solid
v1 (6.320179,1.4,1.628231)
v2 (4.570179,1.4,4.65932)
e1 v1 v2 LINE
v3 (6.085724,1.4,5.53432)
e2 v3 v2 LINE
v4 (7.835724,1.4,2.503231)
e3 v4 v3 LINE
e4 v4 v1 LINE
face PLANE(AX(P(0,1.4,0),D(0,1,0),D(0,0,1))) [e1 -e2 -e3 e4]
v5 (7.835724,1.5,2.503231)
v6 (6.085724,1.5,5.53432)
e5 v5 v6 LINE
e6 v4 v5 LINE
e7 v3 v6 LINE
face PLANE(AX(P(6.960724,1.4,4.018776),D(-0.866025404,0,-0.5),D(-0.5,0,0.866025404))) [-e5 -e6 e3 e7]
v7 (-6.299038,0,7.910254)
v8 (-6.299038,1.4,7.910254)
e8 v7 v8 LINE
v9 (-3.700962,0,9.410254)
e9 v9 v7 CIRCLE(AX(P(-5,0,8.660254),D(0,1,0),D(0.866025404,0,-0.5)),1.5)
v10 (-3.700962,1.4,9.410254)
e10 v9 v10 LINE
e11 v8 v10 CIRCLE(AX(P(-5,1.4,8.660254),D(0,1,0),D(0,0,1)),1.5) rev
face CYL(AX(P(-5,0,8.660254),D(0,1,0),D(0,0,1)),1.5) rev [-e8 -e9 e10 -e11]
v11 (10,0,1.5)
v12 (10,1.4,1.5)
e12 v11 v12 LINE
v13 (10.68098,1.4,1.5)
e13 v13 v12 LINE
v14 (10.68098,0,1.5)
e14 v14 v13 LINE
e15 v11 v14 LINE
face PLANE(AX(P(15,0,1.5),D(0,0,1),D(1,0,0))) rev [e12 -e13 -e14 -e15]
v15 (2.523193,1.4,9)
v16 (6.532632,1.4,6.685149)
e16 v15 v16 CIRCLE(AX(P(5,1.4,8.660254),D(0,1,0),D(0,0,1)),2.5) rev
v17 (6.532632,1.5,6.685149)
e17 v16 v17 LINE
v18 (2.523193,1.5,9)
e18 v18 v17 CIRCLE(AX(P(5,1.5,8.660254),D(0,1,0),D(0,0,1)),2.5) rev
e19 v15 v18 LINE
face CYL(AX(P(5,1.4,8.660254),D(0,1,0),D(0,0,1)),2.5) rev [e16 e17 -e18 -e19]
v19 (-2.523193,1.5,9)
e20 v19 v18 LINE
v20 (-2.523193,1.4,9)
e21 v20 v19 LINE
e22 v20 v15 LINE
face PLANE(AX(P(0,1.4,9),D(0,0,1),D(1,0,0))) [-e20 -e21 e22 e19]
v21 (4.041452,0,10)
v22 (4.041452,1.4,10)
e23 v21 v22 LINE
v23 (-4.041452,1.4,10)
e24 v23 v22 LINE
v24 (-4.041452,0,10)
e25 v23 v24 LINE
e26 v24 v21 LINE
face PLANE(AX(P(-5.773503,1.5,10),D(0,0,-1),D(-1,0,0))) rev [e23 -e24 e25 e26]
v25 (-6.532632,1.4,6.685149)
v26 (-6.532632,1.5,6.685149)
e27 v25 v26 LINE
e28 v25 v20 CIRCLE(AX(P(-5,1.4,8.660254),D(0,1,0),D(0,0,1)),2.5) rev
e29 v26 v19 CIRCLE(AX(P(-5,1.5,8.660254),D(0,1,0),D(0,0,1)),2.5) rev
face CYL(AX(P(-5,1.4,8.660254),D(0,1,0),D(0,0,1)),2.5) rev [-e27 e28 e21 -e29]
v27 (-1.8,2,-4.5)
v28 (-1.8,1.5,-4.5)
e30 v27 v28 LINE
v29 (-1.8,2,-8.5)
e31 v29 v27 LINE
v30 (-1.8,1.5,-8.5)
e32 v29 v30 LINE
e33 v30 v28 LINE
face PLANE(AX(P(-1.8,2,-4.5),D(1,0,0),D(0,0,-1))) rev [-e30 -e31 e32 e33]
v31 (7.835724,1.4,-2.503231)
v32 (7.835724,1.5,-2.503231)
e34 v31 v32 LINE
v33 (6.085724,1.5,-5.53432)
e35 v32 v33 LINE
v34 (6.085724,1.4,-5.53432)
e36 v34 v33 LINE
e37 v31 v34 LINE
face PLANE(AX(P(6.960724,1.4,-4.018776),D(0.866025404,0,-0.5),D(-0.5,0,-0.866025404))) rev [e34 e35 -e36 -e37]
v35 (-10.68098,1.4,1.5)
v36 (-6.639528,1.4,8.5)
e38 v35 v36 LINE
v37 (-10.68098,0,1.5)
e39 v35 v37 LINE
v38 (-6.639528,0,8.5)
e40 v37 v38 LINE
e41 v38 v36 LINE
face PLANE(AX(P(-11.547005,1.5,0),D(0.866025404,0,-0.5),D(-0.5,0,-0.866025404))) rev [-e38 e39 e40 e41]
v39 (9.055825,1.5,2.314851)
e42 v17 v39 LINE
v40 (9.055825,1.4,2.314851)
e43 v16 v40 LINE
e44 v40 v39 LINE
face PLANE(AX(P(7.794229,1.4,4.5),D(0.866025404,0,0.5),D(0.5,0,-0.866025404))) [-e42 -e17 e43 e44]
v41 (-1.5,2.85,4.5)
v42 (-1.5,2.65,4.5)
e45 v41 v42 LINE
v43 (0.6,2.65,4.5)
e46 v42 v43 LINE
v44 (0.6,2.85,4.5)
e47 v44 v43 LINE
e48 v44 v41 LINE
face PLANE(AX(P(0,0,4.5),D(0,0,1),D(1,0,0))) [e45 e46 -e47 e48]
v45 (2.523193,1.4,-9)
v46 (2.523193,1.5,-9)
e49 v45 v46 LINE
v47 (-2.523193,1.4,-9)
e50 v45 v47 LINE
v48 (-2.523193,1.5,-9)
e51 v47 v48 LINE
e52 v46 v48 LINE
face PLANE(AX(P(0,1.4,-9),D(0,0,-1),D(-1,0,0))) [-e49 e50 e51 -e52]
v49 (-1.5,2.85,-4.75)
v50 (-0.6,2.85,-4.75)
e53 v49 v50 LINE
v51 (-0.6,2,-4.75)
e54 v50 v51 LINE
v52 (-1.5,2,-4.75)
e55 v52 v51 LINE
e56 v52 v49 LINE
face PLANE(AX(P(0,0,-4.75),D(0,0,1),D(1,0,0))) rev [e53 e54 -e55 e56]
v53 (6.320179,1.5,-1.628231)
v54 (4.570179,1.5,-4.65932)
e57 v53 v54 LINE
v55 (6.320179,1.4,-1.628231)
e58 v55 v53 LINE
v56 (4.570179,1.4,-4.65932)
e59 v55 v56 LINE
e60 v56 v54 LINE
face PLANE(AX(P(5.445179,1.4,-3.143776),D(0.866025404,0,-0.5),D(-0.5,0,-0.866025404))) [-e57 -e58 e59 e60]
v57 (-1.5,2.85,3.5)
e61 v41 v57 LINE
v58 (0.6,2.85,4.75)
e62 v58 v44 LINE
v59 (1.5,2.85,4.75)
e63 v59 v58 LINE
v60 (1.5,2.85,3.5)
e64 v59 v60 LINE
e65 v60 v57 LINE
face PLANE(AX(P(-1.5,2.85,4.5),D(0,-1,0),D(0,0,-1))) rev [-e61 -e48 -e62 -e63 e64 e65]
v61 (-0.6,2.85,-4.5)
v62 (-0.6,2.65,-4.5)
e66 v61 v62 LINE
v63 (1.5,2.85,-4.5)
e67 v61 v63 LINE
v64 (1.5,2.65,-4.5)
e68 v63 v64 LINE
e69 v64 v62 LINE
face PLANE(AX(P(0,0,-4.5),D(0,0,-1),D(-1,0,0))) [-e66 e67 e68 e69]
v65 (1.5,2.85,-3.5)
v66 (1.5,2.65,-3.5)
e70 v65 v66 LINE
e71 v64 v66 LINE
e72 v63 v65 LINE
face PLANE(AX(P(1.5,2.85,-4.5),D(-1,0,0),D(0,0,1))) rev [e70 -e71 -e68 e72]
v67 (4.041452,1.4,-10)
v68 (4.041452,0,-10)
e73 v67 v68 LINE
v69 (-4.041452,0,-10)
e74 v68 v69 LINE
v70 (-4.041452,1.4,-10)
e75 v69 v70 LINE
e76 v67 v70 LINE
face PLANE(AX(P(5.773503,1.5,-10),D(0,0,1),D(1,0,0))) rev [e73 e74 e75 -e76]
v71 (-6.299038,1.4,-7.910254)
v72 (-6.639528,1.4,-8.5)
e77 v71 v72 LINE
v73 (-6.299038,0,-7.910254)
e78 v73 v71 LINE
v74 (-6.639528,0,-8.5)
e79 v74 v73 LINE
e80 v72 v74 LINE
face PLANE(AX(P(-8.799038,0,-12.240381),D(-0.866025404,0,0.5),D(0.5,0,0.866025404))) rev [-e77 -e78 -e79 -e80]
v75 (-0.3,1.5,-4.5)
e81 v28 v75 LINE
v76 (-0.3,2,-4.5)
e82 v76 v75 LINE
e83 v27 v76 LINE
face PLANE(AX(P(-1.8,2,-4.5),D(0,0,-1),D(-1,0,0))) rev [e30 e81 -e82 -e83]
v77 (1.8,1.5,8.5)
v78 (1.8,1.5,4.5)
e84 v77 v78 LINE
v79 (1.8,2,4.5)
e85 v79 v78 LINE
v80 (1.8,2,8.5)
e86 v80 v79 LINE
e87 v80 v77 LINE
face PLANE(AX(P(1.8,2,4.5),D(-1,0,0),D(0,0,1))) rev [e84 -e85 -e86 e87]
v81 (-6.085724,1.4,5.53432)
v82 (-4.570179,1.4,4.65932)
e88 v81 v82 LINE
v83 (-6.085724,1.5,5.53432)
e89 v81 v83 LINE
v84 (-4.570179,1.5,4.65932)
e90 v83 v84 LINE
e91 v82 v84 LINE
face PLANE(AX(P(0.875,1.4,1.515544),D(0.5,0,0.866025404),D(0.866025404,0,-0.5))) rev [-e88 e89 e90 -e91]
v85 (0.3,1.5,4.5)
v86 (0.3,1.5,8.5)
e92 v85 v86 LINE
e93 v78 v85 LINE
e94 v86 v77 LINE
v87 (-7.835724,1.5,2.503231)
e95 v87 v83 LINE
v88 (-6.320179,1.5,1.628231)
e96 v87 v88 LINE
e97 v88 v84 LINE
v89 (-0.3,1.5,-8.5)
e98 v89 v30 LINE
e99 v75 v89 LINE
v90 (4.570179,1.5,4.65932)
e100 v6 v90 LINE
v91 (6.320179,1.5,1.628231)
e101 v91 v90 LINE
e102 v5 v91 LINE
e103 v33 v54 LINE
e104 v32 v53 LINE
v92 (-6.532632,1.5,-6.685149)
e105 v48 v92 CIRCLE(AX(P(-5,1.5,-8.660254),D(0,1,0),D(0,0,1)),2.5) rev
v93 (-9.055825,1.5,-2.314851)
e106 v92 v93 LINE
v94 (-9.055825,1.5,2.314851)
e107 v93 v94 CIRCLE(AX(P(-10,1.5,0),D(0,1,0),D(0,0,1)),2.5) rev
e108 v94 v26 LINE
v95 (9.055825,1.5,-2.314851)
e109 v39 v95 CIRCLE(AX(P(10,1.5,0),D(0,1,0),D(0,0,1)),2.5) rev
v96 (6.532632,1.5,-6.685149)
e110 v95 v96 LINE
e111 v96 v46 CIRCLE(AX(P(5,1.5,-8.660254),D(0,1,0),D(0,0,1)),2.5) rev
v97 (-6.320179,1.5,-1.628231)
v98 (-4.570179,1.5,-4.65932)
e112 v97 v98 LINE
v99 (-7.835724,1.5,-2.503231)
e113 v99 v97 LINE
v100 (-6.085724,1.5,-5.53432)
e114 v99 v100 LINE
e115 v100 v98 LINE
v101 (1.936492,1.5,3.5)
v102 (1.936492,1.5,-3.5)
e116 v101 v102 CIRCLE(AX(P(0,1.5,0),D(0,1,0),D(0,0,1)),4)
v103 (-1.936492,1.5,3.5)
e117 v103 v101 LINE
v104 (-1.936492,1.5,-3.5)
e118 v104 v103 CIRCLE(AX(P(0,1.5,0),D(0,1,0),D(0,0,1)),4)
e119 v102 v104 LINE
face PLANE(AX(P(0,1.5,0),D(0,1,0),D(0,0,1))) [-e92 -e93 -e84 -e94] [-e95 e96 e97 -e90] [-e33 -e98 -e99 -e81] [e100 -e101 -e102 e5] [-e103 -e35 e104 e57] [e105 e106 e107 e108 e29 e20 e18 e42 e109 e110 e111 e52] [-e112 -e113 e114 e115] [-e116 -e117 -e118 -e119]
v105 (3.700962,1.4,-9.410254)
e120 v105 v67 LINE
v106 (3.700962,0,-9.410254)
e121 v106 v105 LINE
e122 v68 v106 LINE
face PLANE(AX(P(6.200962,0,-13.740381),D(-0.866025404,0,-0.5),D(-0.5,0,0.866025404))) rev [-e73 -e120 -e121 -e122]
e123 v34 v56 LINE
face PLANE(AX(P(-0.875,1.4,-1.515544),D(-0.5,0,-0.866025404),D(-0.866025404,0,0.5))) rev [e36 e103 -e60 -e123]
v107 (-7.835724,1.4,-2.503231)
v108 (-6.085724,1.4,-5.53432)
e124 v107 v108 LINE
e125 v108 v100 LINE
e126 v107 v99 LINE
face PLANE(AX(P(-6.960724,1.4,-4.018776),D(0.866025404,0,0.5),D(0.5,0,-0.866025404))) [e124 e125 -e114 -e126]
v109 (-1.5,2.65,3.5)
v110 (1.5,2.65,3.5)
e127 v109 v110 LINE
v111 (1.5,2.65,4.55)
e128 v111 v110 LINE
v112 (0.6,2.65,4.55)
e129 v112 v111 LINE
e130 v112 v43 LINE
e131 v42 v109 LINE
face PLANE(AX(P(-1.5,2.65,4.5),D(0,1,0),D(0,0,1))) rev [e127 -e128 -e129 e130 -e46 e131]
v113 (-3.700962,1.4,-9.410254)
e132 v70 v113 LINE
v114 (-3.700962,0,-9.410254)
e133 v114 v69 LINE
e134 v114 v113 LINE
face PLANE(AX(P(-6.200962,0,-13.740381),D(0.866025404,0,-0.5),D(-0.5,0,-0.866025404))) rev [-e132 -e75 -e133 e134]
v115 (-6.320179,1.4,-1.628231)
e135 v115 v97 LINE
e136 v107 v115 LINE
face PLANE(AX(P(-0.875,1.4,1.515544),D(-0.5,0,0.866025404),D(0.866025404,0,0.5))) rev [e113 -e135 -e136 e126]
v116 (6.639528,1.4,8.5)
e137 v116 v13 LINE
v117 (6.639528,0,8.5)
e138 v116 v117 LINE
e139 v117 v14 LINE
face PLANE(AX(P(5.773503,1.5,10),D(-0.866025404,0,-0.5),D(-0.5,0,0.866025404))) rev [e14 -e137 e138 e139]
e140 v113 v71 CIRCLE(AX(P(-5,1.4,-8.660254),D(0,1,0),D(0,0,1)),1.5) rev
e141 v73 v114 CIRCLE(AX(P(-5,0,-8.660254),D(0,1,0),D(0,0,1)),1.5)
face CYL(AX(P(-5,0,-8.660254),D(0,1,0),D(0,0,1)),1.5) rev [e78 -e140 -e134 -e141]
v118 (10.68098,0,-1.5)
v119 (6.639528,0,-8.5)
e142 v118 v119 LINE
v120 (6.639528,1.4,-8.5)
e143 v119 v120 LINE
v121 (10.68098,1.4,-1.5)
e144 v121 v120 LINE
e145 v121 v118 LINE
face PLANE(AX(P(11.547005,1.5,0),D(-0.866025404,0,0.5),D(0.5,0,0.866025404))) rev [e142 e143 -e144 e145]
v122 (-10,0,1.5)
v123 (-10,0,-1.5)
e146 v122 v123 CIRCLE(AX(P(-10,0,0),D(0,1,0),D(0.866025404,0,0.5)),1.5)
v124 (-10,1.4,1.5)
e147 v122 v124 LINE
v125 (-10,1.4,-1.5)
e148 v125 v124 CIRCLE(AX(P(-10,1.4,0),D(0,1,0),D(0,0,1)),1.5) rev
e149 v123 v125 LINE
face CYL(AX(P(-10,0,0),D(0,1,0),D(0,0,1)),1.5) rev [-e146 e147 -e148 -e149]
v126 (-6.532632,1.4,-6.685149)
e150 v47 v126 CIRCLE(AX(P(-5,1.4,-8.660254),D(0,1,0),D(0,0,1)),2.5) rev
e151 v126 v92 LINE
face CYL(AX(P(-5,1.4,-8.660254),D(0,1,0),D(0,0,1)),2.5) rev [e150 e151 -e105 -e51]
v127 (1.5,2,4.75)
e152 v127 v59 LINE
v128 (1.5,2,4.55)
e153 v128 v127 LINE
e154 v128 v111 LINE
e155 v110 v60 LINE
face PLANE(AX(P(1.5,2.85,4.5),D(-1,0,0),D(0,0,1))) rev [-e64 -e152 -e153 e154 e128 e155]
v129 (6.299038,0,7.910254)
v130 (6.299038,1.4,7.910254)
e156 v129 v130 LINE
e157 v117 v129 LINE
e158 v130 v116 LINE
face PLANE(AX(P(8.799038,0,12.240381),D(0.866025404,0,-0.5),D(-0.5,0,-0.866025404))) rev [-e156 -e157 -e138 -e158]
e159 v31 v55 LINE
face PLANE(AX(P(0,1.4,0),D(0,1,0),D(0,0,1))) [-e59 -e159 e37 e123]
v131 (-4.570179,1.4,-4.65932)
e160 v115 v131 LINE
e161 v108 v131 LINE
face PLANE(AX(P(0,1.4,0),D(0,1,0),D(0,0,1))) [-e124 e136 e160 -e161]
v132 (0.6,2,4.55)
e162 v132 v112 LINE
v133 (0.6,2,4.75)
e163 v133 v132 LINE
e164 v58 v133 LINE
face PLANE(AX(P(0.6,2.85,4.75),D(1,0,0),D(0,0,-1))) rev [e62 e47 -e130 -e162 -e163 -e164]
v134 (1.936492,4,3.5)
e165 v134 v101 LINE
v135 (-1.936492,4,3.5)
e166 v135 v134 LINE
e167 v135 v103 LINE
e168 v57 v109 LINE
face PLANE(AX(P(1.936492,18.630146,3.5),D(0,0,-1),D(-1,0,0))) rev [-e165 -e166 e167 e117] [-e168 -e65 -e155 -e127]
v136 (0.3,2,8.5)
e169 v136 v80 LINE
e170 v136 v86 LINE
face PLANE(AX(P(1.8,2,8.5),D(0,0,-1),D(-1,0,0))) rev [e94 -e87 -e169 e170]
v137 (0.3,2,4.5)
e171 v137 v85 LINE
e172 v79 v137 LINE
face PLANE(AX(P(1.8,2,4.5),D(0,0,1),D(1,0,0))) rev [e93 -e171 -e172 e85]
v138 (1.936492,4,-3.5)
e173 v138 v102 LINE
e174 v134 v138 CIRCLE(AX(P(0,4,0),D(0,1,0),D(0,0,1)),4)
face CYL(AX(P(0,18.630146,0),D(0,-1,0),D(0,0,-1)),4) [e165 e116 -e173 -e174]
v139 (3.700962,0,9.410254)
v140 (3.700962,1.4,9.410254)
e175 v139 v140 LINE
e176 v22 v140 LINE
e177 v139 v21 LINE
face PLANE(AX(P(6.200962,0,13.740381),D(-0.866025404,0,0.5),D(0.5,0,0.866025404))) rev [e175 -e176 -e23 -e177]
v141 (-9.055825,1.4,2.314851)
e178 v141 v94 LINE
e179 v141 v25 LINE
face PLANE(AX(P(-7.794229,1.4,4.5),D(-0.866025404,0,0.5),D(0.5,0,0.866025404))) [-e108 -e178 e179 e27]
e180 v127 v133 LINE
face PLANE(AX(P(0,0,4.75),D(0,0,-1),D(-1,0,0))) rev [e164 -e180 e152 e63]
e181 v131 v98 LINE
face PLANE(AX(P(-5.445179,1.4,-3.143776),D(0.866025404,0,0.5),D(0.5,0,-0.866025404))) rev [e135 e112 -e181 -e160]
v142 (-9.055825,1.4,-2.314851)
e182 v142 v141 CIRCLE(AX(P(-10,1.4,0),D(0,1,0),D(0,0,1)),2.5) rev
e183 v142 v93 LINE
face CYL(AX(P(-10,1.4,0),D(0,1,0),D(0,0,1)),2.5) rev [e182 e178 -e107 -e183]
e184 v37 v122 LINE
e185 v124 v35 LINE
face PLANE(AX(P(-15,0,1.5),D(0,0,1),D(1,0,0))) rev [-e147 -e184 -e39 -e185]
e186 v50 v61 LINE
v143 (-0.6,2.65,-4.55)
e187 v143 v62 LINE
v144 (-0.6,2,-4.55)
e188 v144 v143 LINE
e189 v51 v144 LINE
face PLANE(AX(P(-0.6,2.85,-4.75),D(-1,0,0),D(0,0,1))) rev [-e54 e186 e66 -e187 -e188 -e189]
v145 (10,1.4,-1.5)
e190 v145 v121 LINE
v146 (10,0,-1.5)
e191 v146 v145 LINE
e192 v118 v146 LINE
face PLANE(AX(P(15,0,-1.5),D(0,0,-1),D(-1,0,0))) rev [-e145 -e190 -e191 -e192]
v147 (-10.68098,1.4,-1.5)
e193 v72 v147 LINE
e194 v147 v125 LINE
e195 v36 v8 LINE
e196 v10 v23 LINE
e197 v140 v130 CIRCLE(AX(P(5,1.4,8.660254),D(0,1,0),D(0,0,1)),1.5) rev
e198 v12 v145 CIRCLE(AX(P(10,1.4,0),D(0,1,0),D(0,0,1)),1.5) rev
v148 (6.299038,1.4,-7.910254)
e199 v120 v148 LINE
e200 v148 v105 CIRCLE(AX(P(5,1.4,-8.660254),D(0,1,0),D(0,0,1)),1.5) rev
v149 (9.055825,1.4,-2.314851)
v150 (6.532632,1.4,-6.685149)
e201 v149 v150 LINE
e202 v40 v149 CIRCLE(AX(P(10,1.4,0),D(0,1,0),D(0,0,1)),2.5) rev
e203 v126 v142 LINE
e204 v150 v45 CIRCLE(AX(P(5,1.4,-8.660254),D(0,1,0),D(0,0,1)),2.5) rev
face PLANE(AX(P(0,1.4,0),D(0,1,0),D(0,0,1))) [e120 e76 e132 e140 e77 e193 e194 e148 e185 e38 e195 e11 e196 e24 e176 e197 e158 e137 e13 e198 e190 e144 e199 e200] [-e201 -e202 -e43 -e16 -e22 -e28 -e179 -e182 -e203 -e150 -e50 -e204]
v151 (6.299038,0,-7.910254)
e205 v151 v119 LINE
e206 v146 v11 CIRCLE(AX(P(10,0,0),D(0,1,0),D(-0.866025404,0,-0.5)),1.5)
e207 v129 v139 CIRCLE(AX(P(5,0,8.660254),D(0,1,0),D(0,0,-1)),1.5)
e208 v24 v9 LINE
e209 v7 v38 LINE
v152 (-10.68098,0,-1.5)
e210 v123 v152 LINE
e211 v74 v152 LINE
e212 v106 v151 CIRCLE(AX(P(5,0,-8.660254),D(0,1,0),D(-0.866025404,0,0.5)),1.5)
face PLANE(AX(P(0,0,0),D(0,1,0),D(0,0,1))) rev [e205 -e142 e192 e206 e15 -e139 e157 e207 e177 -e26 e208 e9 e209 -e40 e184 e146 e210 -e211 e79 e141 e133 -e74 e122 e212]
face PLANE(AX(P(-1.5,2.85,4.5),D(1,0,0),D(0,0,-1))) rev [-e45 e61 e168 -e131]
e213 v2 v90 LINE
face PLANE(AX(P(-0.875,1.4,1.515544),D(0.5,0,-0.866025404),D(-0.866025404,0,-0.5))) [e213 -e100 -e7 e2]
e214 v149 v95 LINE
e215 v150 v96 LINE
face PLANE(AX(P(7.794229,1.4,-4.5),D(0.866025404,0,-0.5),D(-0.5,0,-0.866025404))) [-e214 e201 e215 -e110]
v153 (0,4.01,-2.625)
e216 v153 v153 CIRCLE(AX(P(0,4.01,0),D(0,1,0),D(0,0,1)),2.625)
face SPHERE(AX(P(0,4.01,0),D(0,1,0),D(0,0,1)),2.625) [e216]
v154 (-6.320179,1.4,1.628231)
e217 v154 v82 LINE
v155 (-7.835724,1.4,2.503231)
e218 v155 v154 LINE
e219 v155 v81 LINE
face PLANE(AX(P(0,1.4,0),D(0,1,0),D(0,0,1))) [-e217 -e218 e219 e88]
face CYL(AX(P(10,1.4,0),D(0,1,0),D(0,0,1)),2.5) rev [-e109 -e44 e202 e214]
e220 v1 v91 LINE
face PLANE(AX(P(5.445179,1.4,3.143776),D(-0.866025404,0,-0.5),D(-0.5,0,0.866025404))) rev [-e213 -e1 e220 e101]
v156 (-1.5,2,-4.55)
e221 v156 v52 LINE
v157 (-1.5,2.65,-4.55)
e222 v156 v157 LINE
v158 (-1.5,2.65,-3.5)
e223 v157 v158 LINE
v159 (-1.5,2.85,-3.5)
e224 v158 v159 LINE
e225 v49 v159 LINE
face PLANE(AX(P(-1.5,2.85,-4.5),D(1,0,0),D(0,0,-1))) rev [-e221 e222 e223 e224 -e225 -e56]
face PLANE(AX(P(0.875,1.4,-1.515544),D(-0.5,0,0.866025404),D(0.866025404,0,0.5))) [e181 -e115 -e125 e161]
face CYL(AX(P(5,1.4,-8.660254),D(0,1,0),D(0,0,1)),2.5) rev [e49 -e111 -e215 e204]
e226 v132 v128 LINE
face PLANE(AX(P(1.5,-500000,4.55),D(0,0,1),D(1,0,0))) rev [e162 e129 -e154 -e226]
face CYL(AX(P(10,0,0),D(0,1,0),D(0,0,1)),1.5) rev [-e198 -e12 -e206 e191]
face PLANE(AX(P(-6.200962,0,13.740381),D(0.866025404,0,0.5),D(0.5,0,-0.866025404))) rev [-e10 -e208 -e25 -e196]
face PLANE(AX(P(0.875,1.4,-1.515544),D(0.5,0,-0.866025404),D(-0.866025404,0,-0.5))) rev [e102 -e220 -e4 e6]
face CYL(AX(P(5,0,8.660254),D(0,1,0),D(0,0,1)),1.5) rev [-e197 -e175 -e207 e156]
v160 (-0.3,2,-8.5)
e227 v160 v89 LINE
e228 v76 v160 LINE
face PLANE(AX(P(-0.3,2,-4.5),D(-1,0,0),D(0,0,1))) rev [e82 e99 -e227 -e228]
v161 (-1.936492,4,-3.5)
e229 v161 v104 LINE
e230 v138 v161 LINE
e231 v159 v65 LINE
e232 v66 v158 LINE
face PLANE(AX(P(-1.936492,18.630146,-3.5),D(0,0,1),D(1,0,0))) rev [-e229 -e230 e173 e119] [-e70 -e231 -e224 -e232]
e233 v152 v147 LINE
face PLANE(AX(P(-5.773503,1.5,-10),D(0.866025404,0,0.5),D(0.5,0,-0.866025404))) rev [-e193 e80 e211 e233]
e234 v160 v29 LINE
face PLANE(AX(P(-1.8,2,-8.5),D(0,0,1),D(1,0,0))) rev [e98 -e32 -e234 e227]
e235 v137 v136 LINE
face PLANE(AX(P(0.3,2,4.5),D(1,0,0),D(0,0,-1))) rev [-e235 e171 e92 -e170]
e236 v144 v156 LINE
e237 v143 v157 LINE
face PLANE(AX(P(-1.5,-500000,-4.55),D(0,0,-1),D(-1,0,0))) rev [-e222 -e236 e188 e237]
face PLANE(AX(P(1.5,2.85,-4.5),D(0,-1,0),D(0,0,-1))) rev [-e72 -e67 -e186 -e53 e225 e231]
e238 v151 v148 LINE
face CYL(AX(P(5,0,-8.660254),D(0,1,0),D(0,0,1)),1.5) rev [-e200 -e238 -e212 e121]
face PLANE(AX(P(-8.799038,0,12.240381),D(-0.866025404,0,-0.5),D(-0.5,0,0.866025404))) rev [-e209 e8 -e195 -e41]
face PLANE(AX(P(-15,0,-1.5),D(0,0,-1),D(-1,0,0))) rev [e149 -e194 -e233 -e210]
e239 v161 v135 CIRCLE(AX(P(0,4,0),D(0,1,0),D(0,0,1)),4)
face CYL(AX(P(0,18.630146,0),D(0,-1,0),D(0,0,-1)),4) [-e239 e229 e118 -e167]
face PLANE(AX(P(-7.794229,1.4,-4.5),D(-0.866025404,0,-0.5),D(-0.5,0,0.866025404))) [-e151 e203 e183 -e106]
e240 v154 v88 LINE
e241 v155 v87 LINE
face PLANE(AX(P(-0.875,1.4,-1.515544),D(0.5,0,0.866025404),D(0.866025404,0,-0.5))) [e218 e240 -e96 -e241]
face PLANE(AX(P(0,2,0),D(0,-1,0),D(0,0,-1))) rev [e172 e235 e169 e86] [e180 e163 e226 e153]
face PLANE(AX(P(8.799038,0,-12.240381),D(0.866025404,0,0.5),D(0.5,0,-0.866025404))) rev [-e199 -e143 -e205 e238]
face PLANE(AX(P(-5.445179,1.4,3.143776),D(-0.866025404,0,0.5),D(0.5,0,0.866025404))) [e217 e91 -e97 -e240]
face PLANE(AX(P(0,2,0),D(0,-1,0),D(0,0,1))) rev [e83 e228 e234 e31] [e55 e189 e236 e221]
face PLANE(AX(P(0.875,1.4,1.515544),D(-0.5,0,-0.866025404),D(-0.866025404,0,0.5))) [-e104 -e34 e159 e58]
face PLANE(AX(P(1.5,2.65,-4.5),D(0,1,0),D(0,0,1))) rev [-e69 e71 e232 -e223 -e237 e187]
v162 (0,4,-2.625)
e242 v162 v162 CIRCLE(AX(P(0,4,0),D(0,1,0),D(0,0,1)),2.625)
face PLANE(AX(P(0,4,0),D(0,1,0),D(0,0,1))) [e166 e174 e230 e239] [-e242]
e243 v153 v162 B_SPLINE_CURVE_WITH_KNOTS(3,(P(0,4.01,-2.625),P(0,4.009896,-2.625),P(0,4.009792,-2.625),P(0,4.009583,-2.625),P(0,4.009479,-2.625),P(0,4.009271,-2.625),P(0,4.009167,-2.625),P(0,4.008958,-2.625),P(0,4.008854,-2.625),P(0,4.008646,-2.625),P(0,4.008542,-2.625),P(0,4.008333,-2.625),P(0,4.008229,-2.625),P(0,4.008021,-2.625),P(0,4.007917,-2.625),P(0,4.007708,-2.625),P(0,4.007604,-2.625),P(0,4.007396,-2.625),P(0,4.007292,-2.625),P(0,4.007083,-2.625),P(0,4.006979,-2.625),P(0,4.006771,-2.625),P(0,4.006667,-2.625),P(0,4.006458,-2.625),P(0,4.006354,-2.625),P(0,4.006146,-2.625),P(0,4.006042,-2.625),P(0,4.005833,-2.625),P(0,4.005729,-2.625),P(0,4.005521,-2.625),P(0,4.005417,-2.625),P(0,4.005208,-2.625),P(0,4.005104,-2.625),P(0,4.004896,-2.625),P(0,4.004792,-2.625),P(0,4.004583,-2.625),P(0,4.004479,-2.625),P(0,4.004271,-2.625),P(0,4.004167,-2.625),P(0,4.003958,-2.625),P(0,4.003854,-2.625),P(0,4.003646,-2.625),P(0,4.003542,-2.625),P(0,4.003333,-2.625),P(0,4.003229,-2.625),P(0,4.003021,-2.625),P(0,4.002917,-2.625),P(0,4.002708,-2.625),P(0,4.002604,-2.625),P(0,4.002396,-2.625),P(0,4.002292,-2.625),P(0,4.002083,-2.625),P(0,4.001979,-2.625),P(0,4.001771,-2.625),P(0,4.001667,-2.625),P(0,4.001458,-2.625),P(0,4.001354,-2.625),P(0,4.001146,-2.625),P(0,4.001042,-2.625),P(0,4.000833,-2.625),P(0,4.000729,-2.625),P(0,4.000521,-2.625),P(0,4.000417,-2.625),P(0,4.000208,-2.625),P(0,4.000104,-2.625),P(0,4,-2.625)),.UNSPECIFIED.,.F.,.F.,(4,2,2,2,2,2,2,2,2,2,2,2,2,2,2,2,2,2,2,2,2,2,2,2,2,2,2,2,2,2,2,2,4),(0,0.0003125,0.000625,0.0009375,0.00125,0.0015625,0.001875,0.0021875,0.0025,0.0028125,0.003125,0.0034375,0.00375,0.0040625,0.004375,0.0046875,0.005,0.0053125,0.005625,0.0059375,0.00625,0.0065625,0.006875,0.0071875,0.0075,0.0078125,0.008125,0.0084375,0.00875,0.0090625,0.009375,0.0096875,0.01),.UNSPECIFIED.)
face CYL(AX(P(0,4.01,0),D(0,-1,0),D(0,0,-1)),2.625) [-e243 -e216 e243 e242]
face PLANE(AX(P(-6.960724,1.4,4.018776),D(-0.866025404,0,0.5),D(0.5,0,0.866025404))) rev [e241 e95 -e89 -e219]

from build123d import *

# Parameters (mm, degrees)
BOSS_EXTRUDE1_DEPTH = 1.5
BOSS_EXTRUDE2_DEPTH = 2.5
SKETCH3_R           = 2.625
BOSS_EXTRUDE3_DEPTH = 0.01
SKETCH4_W           = 3
SKETCH4_H           = 0.2
BOSS_EXTRUDE4_DEPTH = 1
SKETCH5_W           = 0.9
SKETCH5_H           = 0.2
BOSS_EXTRUDE5_DEPTH = 0.25
BOSS_EXTRUDE6_REACH = 17.786
SKETCH6_W           = 0.9
SKETCH6_H           = 0.2
SKETCH8_W           = 1.5
SKETCH8_H           = 4
BOSS_EXTRUDE7_DEPTH = 0.5
CIRPATTERN1_COUNT   = 2
CUT_EXTRUDE1_DEPTH  = 17.115258556
CIRPATTERN2_COUNT   = 6
CUT_EXTRUDE2_DEPTH  = 0.1


# Read off the part's stored shape, not the designer's step: Dome1
with BuildPart() as part:
    # Sketch1 → Boss-Extrude1 (new body)
    with BuildSketch(Plane(origin=(0, 0, 0), x_dir=(1, 0, 0), z_dir=(0, 1, 0))):
        Polygon((-11.547005384, 0), (-5.773502692, -10), (5.773502692, -10), (11.547005384, 0), (5.773502692, 10), (-5.773502692, 10), align=None)
    extrude(amount=BOSS_EXTRUDE1_DEPTH)

    # Sketch2 → Boss-Extrude2 (add)
    with BuildSketch(Plane(origin=(0, 1.5, 0), x_dir=(1, 0, 0), z_dir=(0, 1, 0))):
        with BuildLine():
            Line((-1.936491673, 3.5), (1.936491673, 3.5))
            ThreePointArc((1.936491673, 3.5), (4, 0), (1.936491673, -3.5))
            Line((1.936491673, -3.5), (-1.936491673, -3.5))
            ThreePointArc((-1.936491673, -3.5), (-4, 0), (-1.936491673, 3.5))
        make_face()
    extrude(amount=BOSS_EXTRUDE2_DEPTH)

    # Sketch3 → Boss-Extrude3 (add)
    with BuildSketch(Plane(origin=(0, 4, 0), x_dir=(1, 0, 0), z_dir=(0, 1, 0))):
        with Locations(Location((0, 0, 0), (0, 0, 90))):
            Circle(SKETCH3_R)
    extrude(amount=BOSS_EXTRUDE3_DEPTH)

    # Dome1 outline → Dome1 (revolve)
    with BuildSketch(Plane.XY):
        with BuildLine():
            Line((0, 4.01), (2.625, 4.009999997))
            ThreePointArc((2.625, 4.009999997), (1.856155302, 5.8661553), (0, 6.635))
            Line((0, 6.635), (0, 4.01))
        make_face()
    revolve(axis=Axis((0, 0, 0), (0, 1, 0)))

    # Sketch4 → Boss-Extrude4 (add)
    with BuildSketch(Plane.XY.offset(3.5)):
        with Locations((0, 2.75)):
            Rectangle(SKETCH4_W, SKETCH4_H)
    boss_extrude4 = extrude(amount=BOSS_EXTRUDE4_DEPTH)

    # Sketch5 → Boss-Extrude5 (add)
    with BuildSketch(Plane.XY.offset(4.5)):
        with Locations((1.05, 2.75)):
            Rectangle(SKETCH5_W, SKETCH5_H)
    boss_extrude5 = extrude(amount=BOSS_EXTRUDE5_DEPTH)

    # Sketch6 → Boss-Extrude6 (add, up to next)
    with BuildSketch(Plane.XZ.offset(-2.65), mode=Mode.PRIVATE) as boss_extrude6_sk1:
        with Locations((1.05, 4.65)):
            Rectangle(SKETCH6_W, SKETCH6_H)
    boss_extrude6_tool1 = extrude(boss_extrude6_sk1.sketch, amount=BOSS_EXTRUDE6_REACH, mode=Mode.PRIVATE) - part.part
    boss_extrude6 = boss_extrude6_tool1.solids().sort_by_distance((1.05, 2.65, 4.65))[0]
    add(boss_extrude6)

    # Sketch8 → Boss-Extrude7 (add)
    with BuildSketch(Plane(origin=(0, 1.5, 0), x_dir=(1, 0, 0), z_dir=(0, 1, 0))):
        with Locations((1.05, -6.5)):
            Rectangle(SKETCH8_W, SKETCH8_H)
    boss_extrude7 = extrude(amount=BOSS_EXTRUDE7_DEPTH)

    # CirPattern1: Boss-Extrude4, Boss-Extrude5, Boss-Extrude6, Boss-Extrude7 ×2 about axis
    cirpattern1_axis = Axis((0, 0, 0), (0, 1, 0))
    add([boss_extrude4.rotate(cirpattern1_axis, i * 360 / CIRPATTERN1_COUNT) for i in range(1, CIRPATTERN1_COUNT)])
    add([boss_extrude5.rotate(cirpattern1_axis, i * 360 / CIRPATTERN1_COUNT) for i in range(1, CIRPATTERN1_COUNT)])
    add([boss_extrude6.rotate(cirpattern1_axis, i * 360 / CIRPATTERN1_COUNT) for i in range(1, CIRPATTERN1_COUNT)])
    add([boss_extrude7.rotate(cirpattern1_axis, i * 360 / CIRPATTERN1_COUNT) for i in range(1, CIRPATTERN1_COUNT)])

    # Sketch9 → Cut-Extrude1 (cut, through all)
    with BuildSketch(Plane(origin=(0, 1.5, 0), x_dir=(1, 0, 0), z_dir=(0, 1, 0))):
        with BuildLine():
            Line((-6.200961894, 13.740381057), (-3.700961894, 9.410254038))
            ThreePointArc((-3.700961894, 9.410254038), (-4.25, 7.361215932), (-6.299038106, 7.910254038))
            Line((-6.299038106, 7.910254038), (-8.799038106, 12.240381057))
            ThreePointArc((-8.799038106, 12.240381057), (-8.25, 14.289419162), (-6.200961894, 13.740381057))
        make_face()
    cut_extrude1 = extrude(amount=-CUT_EXTRUDE1_DEPTH, mode=Mode.SUBTRACT)

    # CirPattern2: Cut-Extrude1 ×6 about axis
    cirpattern2_axis = Axis((0, 0, 0), (0, 1, 0))
    for i in range(1, CIRPATTERN2_COUNT):
        add(cut_extrude1.rotate(cirpattern2_axis, i * 360 / CIRPATTERN2_COUNT), mode=Mode.SUBTRACT)

    # Sketch10 → Cut-Extrude2 (cut)
    # profile 1 of 5: a face of its own
    with BuildSketch(Plane(origin=(0, 1.5, 0), x_dir=(1, 0, 0), z_dir=(0, 1, 0))):
        with BuildLine():
            Line((-6.639528096, 8.5), (-10.68097998, 1.5))
            Line((-10.68097998, 1.5), (-10, 1.5))
            ThreePointArc((-10, 1.5), (-8.5, 0), (-10, -1.5))
            Line((-10, -1.5), (-10.68097998, -1.5))
            Line((-10.68097998, -1.5), (-6.639528096, -8.5))
            Line((-6.639528096, -8.5), (-6.299038106, -7.910254038))
            ThreePointArc((-6.299038106, -7.910254038), (-4.25, -7.361215932), (-3.700961894, -9.410254038))
            Line((-3.700961894, -9.410254038), (-4.041451884, -10))
            Line((-4.041451884, -10), (4.041451884, -10))
            Line((4.041451884, -10), (3.700961894, -9.410254038))
            ThreePointArc((3.700961894, -9.410254038), (4.25, -7.361215932), (6.299038106, -7.910254038))
            Line((6.299038106, -7.910254038), (6.639528096, -8.5))
            Line((6.639528096, -8.5), (10.68097998, -1.5))
            Line((10.68097998, -1.5), (10, -1.5))
            ThreePointArc((10, -1.5), (8.5, 0), (10, 1.5))
            Line((10, 1.5), (10.68097998, 1.5))
            Line((10.68097998, 1.5), (6.639528096, 8.5))
            Line((6.639528096, 8.5), (6.299038106, 7.910254038))
            ThreePointArc((6.299038106, 7.910254038), (4.25, 7.361215932), (3.700961894, 9.410254038))
            Line((3.700961894, 9.410254038), (4.041451884, 10))
            Line((4.041451884, 10), (-4.041451884, 10))
            Line((-4.041451884, 10), (-3.700961894, 9.410254038))
            ThreePointArc((-3.700961894, 9.410254038), (-4.25, 7.361215932), (-6.299038106, 7.910254038))
            Line((-6.299038106, 7.910254038), (-6.639528096, 8.5))
        make_face()
        with BuildLine():
            ThreePointArc((-2.523193047, 9), (-3.75, 6.495190528), (-6.53263211, 6.685149278))
            Line((-6.53263211, 6.685149278), (-9.055825158, 2.314850722))
            ThreePointArc((-9.055825158, 2.314850722), (-7.5, 0), (-9.055825158, -2.314850722))
            Line((-9.055825158, -2.314850722), (-6.53263211, -6.685149278))
            ThreePointArc((-6.53263211, -6.685149278), (-3.75, -6.495190528), (-2.523193047, -9))
            Line((-2.523193047, -9), (2.523193047, -9))
            ThreePointArc((2.523193047, -9), (3.75, -6.495190528), (6.53263211, -6.685149278))
            Line((6.53263211, -6.685149278), (9.055825158, -2.314850722))
            ThreePointArc((9.055825158, -2.314850722), (7.5, 0), (9.055825158, 2.314850722))
            Line((9.055825158, 2.314850722), (6.53263211, 6.685149278))
            ThreePointArc((6.53263211, 6.685149278), (3.75, 6.495190528), (2.523193047, 9))
            Line((2.523193047, 9), (-2.523193047, 9))
        make_face(mode=Mode.SUBTRACT)
    # profile 2 of 5: a face of its own
    with BuildSketch(Plane(origin=(0, 1.5, 0), x_dir=(1, 0, 0), z_dir=(0, 1, 0))):
        Polygon((-7.835723618, 2.503231198), (-6.320179161, 1.628231198), (-4.570179161, 4.659320111), (-6.085723618, 5.534320111), align=None)
    # profile 3 of 5: a face of its own
    with BuildSketch(Plane(origin=(0, 1.5, 0), x_dir=(1, 0, 0), z_dir=(0, 1, 0))):
        Polygon((-6.320179161, -1.628231198), (-4.570179161, -4.659320111), (-6.085723618, -5.534320111), (-7.835723618, -2.503231198), align=None)
    # profile 4 of 5: a face of its own
    with BuildSketch(Plane(origin=(0, 1.5, 0), x_dir=(1, 0, 0), z_dir=(0, 1, 0))):
        Polygon((7.835723618, -2.503231198), (6.085723618, -5.534320111), (4.570179161, -4.659320111), (6.320179161, -1.628231198), align=None)
    # profile 5 of 5: a face of its own
    with BuildSketch(Plane(origin=(0, 1.5, 0), x_dir=(1, 0, 0), z_dir=(0, 1, 0))):
        Polygon((7.835723618, 2.503231198), (6.320179161, 1.628231198), (4.570179161, 4.659320111), (6.085723618, 5.534320111), align=None)
    extrude(amount=-CUT_EXTRUDE2_DEPTH, mode=Mode.SUBTRACT)


solid = part.part
